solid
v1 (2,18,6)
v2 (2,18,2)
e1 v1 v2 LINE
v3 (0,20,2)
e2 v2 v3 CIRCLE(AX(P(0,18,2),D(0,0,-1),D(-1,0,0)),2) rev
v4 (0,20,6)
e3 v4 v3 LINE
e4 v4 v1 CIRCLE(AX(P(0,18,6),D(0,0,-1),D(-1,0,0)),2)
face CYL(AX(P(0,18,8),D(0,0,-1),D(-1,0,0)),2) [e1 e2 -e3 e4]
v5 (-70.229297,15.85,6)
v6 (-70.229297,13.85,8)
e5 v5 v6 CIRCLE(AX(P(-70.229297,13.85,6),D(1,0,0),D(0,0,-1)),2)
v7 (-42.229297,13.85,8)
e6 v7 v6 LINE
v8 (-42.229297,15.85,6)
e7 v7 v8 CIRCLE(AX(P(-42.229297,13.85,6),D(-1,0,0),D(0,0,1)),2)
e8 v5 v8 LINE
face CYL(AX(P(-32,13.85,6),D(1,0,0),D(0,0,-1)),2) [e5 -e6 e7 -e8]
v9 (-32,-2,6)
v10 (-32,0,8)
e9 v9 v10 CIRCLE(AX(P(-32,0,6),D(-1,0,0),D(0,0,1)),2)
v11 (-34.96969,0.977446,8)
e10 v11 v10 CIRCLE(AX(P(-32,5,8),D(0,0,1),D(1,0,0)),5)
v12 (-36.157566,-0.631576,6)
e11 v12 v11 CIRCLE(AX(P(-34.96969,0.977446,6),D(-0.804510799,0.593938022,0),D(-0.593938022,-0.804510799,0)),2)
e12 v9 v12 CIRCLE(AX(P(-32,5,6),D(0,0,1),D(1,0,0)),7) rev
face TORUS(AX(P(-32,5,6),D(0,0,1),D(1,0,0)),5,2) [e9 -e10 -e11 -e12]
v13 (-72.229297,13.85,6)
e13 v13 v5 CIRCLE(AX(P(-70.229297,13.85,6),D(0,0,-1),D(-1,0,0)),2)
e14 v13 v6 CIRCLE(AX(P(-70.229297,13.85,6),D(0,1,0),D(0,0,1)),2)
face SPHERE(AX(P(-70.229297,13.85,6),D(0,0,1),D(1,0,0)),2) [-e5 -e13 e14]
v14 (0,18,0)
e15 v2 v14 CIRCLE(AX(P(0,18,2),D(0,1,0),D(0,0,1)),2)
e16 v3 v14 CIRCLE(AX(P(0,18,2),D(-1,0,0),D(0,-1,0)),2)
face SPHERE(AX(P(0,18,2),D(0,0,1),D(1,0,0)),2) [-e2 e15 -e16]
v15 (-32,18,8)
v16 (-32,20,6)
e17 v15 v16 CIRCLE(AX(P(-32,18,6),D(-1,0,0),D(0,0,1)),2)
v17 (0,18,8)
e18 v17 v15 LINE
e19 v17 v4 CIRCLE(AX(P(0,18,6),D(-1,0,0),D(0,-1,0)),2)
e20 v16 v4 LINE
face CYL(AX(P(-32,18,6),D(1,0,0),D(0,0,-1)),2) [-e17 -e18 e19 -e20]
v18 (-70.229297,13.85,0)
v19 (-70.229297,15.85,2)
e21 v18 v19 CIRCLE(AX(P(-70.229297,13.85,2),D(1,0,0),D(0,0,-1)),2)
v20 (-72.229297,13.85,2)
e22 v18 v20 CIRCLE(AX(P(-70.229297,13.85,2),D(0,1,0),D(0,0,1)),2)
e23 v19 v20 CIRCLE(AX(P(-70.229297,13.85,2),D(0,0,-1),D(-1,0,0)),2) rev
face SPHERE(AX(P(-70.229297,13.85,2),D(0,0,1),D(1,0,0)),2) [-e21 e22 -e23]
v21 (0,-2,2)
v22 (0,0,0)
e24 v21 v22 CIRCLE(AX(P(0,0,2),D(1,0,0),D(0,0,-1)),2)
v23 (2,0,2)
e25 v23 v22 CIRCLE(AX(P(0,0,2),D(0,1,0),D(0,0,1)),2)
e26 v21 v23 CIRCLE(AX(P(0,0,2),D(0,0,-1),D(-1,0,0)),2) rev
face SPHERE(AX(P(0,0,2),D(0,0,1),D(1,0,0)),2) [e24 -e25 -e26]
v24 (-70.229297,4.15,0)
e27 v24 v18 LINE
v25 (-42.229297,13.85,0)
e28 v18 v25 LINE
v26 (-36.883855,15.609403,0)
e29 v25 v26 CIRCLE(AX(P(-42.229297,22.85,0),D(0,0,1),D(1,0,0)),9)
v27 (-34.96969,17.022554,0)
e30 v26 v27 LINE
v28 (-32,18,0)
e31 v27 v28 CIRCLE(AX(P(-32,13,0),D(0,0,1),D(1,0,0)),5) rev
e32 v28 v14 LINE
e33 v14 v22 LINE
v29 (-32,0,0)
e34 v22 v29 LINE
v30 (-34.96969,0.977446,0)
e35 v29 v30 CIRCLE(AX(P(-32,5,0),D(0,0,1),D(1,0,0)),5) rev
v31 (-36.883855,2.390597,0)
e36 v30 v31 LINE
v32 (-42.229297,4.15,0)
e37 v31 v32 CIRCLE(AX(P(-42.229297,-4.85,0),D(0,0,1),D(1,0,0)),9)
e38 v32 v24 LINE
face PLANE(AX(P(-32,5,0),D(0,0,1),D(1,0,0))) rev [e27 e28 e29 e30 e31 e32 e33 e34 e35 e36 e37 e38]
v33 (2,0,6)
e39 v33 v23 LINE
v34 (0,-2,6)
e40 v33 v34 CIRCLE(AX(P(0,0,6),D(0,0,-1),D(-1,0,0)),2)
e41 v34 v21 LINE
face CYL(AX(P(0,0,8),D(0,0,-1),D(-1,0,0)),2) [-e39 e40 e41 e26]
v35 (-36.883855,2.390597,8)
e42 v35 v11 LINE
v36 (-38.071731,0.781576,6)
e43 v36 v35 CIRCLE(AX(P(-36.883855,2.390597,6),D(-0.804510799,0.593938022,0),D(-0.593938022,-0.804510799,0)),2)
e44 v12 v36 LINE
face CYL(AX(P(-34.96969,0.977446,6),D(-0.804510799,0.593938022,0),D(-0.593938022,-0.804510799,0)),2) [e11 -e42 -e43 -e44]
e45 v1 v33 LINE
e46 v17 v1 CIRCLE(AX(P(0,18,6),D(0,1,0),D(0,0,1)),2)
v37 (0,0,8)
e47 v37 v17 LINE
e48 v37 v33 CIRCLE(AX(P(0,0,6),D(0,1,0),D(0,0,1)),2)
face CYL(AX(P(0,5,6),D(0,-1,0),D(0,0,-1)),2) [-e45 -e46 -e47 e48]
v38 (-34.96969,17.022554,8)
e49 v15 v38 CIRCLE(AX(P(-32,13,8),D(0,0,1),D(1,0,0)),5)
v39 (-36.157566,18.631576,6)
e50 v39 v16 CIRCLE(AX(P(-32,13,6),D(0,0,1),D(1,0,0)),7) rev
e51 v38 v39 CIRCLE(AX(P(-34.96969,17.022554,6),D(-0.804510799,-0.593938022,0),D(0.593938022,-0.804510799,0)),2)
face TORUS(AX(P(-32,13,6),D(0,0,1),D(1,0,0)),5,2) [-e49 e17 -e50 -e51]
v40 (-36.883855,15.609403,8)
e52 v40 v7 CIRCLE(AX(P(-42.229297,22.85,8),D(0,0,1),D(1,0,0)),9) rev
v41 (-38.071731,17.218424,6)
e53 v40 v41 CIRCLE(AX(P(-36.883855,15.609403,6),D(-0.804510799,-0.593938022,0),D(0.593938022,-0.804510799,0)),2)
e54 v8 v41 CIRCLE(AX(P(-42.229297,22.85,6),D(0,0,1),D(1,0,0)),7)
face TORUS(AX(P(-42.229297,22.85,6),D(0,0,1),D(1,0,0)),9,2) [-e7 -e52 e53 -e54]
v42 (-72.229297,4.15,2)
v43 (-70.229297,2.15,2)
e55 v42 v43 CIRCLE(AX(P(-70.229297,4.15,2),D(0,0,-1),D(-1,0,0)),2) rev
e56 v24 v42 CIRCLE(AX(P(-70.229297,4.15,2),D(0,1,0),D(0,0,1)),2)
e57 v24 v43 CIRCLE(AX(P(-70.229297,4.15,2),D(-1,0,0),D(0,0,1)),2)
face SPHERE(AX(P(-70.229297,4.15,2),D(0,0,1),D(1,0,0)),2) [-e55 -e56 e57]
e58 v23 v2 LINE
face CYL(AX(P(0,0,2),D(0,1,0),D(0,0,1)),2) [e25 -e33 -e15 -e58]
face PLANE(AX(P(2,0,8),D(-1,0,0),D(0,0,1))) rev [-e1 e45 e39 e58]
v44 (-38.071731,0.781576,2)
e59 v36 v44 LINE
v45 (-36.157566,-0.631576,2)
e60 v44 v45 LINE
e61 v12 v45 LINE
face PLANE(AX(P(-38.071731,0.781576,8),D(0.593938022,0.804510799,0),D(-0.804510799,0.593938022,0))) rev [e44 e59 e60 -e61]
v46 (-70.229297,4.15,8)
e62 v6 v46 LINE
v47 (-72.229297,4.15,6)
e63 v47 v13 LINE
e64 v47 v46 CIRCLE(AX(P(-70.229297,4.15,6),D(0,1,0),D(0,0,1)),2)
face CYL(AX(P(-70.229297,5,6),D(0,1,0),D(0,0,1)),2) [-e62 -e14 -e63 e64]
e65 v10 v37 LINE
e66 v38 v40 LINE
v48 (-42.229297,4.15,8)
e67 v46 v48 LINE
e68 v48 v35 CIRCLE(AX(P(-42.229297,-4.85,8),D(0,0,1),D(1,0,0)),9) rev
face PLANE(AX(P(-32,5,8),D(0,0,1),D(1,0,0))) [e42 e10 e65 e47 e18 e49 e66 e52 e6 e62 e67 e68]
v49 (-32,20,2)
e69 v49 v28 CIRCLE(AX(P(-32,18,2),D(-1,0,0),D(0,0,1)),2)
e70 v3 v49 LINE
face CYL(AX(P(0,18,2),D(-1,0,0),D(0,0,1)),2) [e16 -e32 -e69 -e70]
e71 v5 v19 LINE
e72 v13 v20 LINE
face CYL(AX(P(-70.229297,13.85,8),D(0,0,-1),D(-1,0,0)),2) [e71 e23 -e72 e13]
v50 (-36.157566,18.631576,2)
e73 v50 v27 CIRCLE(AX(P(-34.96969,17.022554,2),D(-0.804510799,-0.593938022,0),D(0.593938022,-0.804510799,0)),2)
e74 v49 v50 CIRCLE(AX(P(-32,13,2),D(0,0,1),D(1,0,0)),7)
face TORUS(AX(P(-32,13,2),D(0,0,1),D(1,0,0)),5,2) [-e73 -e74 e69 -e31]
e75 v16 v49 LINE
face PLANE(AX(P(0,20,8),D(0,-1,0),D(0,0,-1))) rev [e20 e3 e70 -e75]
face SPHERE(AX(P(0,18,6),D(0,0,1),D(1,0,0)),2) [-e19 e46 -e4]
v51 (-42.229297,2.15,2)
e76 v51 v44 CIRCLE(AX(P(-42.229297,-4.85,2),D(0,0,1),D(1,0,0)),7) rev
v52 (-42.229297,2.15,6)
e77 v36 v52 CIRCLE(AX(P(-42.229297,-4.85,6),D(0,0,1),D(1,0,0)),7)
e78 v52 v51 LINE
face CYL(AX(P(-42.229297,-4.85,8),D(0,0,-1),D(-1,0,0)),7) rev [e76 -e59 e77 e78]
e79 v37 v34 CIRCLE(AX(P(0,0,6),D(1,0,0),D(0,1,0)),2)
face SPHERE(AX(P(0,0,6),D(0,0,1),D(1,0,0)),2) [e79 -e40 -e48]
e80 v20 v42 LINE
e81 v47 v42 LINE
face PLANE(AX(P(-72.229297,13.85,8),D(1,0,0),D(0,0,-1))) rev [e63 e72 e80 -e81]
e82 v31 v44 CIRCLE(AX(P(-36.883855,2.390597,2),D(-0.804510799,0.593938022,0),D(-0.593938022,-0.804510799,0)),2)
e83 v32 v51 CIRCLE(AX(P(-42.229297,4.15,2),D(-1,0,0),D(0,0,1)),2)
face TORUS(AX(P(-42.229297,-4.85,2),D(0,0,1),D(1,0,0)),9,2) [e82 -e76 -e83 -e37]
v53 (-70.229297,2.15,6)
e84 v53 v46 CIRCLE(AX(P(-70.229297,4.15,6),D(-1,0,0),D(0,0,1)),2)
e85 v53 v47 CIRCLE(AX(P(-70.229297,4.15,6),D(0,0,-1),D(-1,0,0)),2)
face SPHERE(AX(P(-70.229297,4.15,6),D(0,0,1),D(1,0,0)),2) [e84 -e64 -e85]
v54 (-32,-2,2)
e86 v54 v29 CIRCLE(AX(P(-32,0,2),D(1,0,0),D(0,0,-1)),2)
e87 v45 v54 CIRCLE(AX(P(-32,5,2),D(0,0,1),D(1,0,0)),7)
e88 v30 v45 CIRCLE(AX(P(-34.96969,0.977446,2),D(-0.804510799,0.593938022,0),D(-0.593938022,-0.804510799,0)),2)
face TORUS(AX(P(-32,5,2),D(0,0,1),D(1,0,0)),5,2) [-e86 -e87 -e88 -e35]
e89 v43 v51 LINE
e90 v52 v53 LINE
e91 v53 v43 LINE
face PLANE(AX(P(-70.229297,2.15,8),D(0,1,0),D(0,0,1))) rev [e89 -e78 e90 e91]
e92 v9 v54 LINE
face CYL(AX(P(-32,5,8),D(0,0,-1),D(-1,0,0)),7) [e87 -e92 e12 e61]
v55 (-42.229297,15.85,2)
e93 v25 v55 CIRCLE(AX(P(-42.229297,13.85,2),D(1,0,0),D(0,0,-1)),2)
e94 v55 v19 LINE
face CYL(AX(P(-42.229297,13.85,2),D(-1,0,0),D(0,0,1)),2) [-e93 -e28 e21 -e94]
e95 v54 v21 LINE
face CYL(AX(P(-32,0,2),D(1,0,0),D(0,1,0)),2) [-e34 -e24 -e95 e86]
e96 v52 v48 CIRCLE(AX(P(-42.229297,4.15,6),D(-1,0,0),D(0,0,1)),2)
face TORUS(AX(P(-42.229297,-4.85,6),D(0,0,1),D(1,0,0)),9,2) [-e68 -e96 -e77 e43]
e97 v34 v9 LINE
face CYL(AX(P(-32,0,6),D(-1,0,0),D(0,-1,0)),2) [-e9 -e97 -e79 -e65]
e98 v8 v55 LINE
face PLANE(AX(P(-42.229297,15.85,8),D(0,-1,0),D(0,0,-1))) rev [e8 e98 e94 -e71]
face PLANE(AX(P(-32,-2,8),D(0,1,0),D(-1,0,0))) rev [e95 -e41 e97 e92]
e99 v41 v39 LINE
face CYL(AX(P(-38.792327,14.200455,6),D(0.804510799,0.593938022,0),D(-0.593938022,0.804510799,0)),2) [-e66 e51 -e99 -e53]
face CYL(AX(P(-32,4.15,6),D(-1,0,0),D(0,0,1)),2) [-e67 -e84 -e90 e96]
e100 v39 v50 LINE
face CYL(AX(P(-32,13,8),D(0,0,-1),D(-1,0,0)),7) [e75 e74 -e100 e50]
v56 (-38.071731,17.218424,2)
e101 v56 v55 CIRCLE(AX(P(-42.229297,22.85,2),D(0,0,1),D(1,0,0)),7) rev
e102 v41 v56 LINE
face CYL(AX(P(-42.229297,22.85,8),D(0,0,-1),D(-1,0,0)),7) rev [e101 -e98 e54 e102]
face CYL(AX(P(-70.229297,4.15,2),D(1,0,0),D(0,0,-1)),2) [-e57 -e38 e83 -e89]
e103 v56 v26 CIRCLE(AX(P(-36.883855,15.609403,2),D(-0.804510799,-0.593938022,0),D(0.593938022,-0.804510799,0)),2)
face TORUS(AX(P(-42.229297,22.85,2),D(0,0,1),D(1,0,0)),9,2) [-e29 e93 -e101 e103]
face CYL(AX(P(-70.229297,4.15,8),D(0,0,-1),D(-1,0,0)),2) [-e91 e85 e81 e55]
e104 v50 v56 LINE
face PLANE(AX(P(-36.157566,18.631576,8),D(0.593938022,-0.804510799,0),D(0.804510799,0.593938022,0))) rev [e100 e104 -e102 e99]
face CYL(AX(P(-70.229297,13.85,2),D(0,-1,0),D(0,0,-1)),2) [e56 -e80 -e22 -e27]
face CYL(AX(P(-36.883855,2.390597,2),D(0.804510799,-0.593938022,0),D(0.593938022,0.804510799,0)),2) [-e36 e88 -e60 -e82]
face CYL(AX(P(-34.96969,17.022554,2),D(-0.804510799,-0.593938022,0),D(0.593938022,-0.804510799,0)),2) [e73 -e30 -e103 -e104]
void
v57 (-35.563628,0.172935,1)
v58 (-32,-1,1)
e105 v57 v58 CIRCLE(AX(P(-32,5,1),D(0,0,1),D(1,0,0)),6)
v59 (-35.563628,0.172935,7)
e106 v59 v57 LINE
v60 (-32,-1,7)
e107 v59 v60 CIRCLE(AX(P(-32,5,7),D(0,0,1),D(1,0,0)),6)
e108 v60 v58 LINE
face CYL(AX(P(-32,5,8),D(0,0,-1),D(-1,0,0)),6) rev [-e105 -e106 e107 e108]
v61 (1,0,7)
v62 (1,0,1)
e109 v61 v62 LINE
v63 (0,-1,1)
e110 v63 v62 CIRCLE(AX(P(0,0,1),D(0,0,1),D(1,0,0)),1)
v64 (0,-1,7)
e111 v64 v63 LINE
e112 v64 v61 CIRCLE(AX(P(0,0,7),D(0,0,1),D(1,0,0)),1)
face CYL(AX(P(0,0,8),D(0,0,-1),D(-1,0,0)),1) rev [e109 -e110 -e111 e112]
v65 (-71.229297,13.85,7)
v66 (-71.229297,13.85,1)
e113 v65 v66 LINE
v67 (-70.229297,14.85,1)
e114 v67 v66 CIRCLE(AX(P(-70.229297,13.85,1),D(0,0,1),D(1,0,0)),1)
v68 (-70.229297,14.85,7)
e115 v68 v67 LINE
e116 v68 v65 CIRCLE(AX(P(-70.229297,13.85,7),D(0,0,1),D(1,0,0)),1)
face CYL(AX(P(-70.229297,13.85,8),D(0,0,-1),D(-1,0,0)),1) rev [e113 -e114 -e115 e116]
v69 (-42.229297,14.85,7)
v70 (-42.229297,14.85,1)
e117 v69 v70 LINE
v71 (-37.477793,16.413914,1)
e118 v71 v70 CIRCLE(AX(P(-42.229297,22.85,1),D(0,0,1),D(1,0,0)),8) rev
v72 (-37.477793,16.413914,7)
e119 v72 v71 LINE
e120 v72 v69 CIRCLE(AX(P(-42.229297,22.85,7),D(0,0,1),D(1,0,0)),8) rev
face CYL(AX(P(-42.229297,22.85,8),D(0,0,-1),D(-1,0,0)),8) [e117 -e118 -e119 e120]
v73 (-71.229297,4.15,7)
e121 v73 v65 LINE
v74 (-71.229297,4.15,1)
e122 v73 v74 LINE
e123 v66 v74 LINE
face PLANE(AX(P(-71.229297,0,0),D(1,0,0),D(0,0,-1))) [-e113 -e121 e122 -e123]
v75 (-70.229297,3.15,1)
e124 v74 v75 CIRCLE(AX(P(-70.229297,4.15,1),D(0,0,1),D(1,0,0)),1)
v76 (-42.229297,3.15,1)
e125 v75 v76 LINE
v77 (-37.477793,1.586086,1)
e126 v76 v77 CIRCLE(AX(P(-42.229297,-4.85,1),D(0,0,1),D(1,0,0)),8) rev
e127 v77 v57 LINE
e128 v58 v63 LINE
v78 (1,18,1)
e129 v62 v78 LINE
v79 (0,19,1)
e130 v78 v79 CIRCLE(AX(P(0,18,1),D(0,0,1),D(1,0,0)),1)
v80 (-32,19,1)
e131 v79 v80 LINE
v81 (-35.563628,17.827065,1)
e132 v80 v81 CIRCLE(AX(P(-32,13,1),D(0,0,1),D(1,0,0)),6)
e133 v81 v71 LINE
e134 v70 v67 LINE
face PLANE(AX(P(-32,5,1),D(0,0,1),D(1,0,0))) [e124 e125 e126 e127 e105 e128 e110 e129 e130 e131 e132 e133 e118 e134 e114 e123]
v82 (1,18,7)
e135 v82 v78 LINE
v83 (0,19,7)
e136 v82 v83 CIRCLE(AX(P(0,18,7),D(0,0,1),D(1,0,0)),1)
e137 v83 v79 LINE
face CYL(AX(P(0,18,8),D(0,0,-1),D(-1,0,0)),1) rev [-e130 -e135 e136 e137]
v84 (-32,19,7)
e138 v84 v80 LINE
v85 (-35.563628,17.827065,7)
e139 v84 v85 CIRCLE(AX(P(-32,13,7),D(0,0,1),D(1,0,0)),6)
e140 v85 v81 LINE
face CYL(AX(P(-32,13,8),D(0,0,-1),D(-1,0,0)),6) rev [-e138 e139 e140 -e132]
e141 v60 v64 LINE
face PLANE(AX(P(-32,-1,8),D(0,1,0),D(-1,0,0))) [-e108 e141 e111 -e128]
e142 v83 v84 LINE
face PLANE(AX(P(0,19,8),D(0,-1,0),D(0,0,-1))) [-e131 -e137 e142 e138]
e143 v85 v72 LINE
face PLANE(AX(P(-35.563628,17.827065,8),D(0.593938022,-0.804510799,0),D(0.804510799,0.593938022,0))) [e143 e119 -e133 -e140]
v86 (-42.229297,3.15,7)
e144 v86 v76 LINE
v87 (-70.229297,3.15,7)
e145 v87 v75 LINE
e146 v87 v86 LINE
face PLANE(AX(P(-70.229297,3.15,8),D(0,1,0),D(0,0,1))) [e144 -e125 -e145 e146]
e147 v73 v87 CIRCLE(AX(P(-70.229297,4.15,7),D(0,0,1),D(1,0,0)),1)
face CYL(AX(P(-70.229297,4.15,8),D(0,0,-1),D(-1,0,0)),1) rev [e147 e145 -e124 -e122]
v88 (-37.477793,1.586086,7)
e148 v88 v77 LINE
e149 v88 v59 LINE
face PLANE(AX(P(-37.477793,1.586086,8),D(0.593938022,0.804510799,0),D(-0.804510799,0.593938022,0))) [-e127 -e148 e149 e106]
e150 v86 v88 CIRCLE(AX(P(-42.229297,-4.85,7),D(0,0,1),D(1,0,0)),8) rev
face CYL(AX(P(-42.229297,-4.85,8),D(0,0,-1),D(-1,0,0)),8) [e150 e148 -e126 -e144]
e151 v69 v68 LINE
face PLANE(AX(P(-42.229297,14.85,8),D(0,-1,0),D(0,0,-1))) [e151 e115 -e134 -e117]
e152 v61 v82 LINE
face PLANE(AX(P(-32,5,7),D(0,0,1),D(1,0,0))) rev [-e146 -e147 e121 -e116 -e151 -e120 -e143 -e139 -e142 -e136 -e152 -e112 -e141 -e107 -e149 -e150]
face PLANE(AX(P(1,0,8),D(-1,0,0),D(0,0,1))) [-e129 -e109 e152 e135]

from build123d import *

# Parameters (mm, degrees)
BOSS_EXTRUDE2_DEPTH = 8
SHELL1_START        = 1
SHELL1_DEPTH        = 6
SKETCH5_W           = 6
SKETCH5_H           = 9.7
BOSS_EXTRUDE4_DEPTH = 1
FILLET1_R           = 2


# Read off the part's stored shape, not the designer's step: Shell1
with BuildPart() as part:
    # Sketch2 → Boss-Extrude2 (new body)
    with BuildSketch(Plane.XY):
        with BuildLine():
            Line((0, 20), (-32, 20))
            ThreePointArc((-32, 20), (-34.188489303, 19.649098779), (-36.157566157, 18.631575592))
            Line((-36.157566157, 18.631575592), (-38.071731179, 17.218424408))
            ThreePointArc((-38.071731179, 17.218424408), (-40.040808034, 16.200901221), (-42.229297337, 15.85))
            Line((-42.229297337, 15.85), (-70.229297337, 15.85))
            ThreePointArc((-70.229297337, 15.85), (-71.643510899, 15.264213562), (-72.229297337, 13.85))
            Line((-72.229297337, 13.85), (-72.229297337, 4.15))
            ThreePointArc((-72.229297337, 4.15), (-71.643510899, 2.735786438), (-70.229297337, 2.15))
            Line((-70.229297337, 2.15), (-42.229297337, 2.15))
            ThreePointArc((-42.229297337, 2.15), (-40.040808034, 1.799098779), (-38.071731179, 0.781575592))
            Line((-38.071731179, 0.781575592), (-36.157566157, -0.631575592))
            ThreePointArc((-36.157566157, -0.631575592), (-34.188489303, -1.649098779), (-32, -2))
            Line((-32, -2), (0, -2))
            ThreePointArc((0, -2), (1.414213562, -1.414213562), (2, 0))
            Line((2, 0), (2, 18))
            ThreePointArc((2, 18), (1.414213562, 19.414213562), (0, 20))
        make_face()
    extrude(amount=BOSS_EXTRUDE2_DEPTH)

    # Shell1 outline → Shell1 (cut)
    with BuildSketch(Plane.XY.offset(SHELL1_START)):
        with BuildLine():
            Line((-71.229297337, 13.85), (-72.229297337, 13.85))
            Line((-72.229297337, 13.85), (-72.229297337, 4.15))
            Line((-72.229297337, 4.15), (-71.229297337, 4.15))
            ThreePointArc((-71.229297337, 4.15), (-70.936404118, 3.442893219), (-70.229297337, 3.15))
            Line((-70.229297337, 3.15), (-42.229297337, 3.15))
            ThreePointArc((-42.229297337, 3.15), (-39.728166705, 2.748970033), (-37.477793157, 1.586086391))
            Line((-37.477793157, 1.586086391), (-35.563628135, 0.172935207))
            ThreePointArc((-35.563628135, 0.172935207), (-33.875847974, -0.699227525), (-32, -1))
            Line((-32, -1), (0, -1))
            ThreePointArc((0, -1), (0.707106781, -0.707106781), (1, 0))
            Line((1, 0), (1, 18))
            ThreePointArc((1, 18), (0.707106781, 18.707106781), (0, 19))
            Line((0, 19), (-32, 19))
            ThreePointArc((-32, 19), (-33.875847974, 18.699227525), (-35.563628135, 17.827064793))
            Line((-35.563628135, 17.827064793), (-37.477793157, 16.413913609))
            ThreePointArc((-37.477793157, 16.413913609), (-39.728166705, 15.251029967), (-42.229297337, 14.85))
            Line((-42.229297337, 14.85), (-70.229297337, 14.85))
            ThreePointArc((-70.229297337, 14.85), (-70.936404118, 14.557106781), (-71.229297337, 13.85))
        make_face()
    extrude(amount=SHELL1_DEPTH, mode=Mode.SUBTRACT)

    # Sketch5 → Boss-Extrude4 (add)
    with BuildSketch(Plane.ZY.offset(72.229297337)):
        with Locations((4, 9)):
            Rectangle(SKETCH5_W, SKETCH5_H)
    extrude(amount=-BOSS_EXTRUDE4_DEPTH)

    # Fillet1
    fillet1_edges = [part.edges().sort_by_distance(p)[0] for p in [
        (1.414213562, -1.414213562, 8),
        (2, 9, 8),
        (-37.114648668, 0.075, 0),
        (-40.040808034, 1.799098779, 0),
        (-56.229297337, 2.15, 0),
        (-71.643510899, 2.735786438, 0),
        (-72.229297337, 9, 0),
        (1.414213562, 19.414213562, 8),
        (-71.643510899, 15.264213562, 0),
        (-56.229297337, 15.85, 0),
        (-40.040808034, 16.200901221, 0),
        (-37.114648668, 17.925, 0),
        (-34.188489303, 19.649098779, 0),
        (-16, 20, 0),
        (1.414213562, 19.414213562, 0),
        (2, 9, 0),
        (-16, 20, 8),
        (1.414213562, -1.414213562, 0),
        (-16, -2, 0),
        (-34.188489303, -1.649098779, 0),
        (-34.188489303, 19.649098779, 8),
        (-37.114648668, 17.925, 8),
        (-40.040808034, 16.200901221, 8),
        (-56.229297337, 15.85, 8),
        (-71.643510899, 15.264213562, 8),
        (-72.229297337, 9, 8),
        (-34.188489303, -1.649098779, 8),
        (-71.643510899, 2.735786438, 8),
        (-56.229297337, 2.15, 8),
        (-40.040808034, 1.799098779, 8),
        (-37.114648668, 0.075, 8),
        (-16, -2, 8),
    ]]
    fillet(fillet1_edges, radius=FILLET1_R)


solid = part.part
